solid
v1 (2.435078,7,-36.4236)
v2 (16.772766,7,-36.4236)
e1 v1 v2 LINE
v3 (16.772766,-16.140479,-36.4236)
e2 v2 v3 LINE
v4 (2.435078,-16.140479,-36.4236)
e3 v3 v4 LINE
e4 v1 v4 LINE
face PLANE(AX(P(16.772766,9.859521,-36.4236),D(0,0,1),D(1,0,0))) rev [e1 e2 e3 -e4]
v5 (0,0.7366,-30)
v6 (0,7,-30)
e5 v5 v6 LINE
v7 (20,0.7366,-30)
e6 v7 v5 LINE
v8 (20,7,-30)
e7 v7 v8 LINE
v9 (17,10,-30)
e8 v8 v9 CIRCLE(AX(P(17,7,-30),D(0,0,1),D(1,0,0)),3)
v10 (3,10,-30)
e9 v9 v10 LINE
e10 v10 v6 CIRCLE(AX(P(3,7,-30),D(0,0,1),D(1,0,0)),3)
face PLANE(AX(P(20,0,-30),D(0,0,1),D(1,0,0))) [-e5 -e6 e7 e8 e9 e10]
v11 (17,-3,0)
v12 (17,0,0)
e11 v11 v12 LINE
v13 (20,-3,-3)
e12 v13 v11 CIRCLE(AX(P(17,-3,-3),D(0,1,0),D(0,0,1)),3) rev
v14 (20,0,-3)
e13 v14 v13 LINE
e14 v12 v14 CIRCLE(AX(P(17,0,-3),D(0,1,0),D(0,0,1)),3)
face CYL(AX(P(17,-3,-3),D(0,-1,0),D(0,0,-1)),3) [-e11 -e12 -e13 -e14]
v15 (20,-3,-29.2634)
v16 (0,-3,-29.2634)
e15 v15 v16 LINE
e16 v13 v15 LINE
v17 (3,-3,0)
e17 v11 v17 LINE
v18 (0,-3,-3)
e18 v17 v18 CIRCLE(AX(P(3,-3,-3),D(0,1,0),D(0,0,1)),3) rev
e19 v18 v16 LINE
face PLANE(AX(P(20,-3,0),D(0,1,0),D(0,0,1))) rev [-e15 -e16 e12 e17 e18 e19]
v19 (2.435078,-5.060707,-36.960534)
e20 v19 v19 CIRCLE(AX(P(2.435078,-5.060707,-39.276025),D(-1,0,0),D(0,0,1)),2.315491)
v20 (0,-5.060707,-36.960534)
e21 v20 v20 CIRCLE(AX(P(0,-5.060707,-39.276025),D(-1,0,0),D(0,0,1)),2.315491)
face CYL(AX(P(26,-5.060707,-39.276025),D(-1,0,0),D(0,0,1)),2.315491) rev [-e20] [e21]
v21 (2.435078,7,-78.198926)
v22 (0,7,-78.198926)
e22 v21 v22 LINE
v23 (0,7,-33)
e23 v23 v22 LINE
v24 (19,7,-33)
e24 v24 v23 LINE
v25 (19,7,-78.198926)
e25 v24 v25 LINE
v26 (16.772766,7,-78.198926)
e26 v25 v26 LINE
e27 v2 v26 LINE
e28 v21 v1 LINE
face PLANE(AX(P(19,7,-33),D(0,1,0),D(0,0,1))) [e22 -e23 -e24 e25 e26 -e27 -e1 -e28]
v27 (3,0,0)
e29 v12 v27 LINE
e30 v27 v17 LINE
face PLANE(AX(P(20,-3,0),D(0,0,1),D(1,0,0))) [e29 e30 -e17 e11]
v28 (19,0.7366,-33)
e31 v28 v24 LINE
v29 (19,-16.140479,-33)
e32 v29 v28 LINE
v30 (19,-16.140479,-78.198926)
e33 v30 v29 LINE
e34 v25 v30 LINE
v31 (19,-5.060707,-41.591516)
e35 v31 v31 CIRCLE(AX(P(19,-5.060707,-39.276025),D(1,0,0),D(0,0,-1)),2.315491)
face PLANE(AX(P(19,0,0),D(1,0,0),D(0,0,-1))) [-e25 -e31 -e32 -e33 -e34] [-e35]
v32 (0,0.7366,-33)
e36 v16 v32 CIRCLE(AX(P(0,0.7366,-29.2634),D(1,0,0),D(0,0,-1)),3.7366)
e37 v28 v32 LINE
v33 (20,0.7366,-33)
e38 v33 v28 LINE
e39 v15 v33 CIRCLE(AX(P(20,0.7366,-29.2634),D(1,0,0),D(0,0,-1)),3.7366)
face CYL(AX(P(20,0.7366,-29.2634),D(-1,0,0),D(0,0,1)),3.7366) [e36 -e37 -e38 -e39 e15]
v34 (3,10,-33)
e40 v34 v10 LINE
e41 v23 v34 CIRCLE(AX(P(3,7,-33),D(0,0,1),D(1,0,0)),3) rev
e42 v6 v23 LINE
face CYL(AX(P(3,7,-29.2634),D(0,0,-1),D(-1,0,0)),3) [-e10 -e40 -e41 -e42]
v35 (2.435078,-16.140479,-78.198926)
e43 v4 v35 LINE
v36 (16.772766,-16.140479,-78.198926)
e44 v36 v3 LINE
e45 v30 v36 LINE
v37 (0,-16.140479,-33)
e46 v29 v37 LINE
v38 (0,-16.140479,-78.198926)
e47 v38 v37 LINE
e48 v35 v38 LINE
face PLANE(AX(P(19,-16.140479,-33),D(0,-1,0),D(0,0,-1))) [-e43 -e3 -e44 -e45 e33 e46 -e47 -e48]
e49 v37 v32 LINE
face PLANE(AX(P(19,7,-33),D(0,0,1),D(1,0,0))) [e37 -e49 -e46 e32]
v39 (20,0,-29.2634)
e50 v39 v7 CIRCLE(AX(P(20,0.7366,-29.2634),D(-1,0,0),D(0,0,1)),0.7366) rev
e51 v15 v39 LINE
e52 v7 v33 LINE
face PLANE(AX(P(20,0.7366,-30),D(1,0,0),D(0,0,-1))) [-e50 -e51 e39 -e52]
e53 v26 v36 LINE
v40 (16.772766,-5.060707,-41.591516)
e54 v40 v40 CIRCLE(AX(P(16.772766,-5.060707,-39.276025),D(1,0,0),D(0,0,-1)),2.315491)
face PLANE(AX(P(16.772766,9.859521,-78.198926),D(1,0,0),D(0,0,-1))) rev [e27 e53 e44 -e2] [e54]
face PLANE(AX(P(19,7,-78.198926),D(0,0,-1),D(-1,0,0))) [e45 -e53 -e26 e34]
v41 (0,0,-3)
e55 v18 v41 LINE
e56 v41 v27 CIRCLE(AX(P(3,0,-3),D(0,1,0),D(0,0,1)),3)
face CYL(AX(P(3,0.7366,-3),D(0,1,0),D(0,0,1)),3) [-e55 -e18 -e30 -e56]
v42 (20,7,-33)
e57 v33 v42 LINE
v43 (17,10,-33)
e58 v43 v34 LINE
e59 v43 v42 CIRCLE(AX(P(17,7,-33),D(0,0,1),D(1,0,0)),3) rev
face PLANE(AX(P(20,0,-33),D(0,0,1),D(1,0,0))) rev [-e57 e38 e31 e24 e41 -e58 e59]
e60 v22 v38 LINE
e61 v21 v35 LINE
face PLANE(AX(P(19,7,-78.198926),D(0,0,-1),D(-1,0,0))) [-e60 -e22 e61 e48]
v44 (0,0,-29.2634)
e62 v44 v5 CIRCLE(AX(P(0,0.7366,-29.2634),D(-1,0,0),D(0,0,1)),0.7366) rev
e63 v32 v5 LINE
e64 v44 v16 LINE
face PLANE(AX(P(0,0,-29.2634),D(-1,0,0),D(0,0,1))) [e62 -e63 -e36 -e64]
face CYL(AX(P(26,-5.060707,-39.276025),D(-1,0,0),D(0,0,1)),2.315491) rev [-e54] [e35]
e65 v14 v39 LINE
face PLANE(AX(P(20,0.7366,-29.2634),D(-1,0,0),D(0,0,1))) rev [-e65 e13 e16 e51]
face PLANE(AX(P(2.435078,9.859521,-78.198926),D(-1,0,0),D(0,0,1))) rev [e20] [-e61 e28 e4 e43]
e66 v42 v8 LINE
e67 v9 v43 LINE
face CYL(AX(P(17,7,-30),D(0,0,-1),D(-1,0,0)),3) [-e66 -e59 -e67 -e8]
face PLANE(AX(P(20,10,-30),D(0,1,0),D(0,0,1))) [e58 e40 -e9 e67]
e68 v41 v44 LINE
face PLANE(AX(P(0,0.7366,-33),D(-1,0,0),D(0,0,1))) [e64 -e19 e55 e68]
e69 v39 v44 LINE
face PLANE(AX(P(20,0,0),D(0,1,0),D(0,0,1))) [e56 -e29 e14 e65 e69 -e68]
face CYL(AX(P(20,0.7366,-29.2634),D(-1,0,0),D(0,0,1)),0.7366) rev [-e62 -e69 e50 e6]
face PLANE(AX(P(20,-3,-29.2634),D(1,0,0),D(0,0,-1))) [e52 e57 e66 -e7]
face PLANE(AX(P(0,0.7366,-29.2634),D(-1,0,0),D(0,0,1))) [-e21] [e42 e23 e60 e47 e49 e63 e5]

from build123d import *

# Parameters (mm, degrees)
BASE_FLANGE1_DEPTH  = 20
FILLET1_R           = 3
SKETCH2_W           = 45.198925831
SKETCH2_H           = 23.140478888
BOSS_EXTRUDE1_DEPTH = 19
SKETCH3_W           = 14.337687556
SKETCH3_H           = 41.775325978
CUT_EXTRUDE1_DEPTH  = 26
SKETCH4_R           = 2.315491067
CUT_EXTRUDE2_DEPTH  = 26


# Sheet-metal steps are written as plain solids
with BuildPart() as part:
    # Sketch1 → Base-Flange1 (new body)
    with BuildSketch(Plane(origin=(0, 0, 0), x_dir=(0, 0, -1), z_dir=(1, 0, 0))):
        with BuildLine():
            Line((0, 0), (29.2634, 0))
            ThreePointArc((29.2634, 0), (29.784254855, 0.215745145), (30, 0.7366))
            Line((30, 0.7366), (30, 10))
            Line((30, 10), (33, 10))
            Line((33, 10), (33, 0.7366))
            ThreePointArc((33, 0.7366), (31.905575199, -1.905575199), (29.2634, -3))
            Line((29.2634, -3), (0, -3))
            Line((0, -3), (0, 0))
        make_face()
    extrude(amount=BASE_FLANGE1_DEPTH)

    # Fillet1
    fillet1_edges = [part.edges().sort_by_distance(p)[0] for p in [
        (20, -1.5, 0),
        (20, 10, -31.5),
        (0, -1.5, 0),
        (0, 10, -31.5),
    ]]
    fillet(fillet1_edges, radius=FILLET1_R)

    # Sketch2 → Boss-Extrude1 (add)
    with BuildSketch(Plane.ZY):
        with Locations((-55.599462916, -4.570239444)):
            Rectangle(SKETCH2_W, SKETCH2_H)
    extrude(amount=-BOSS_EXTRUDE1_DEPTH)

    # Sketch3 → Cut-Extrude1 (cut)
    with BuildSketch(Plane(origin=(0, -16.140478888, 0), x_dir=(-1, 0, 0), z_dir=(0, -1, 0))):
        with Locations((-9.603922135, 57.311262842)):
            Rectangle(SKETCH3_W, SKETCH3_H)
    extrude(amount=-CUT_EXTRUDE1_DEPTH, mode=Mode.SUBTRACT)

    # Sketch4 → Cut-Extrude2 (cut)
    with BuildSketch(Plane.ZY):
        with Locations((-39.276024705, -5.060706685)):
            Circle(SKETCH4_R)
    extrude(amount=-CUT_EXTRUDE2_DEPTH, mode=Mode.SUBTRACT)


solid = part.part
